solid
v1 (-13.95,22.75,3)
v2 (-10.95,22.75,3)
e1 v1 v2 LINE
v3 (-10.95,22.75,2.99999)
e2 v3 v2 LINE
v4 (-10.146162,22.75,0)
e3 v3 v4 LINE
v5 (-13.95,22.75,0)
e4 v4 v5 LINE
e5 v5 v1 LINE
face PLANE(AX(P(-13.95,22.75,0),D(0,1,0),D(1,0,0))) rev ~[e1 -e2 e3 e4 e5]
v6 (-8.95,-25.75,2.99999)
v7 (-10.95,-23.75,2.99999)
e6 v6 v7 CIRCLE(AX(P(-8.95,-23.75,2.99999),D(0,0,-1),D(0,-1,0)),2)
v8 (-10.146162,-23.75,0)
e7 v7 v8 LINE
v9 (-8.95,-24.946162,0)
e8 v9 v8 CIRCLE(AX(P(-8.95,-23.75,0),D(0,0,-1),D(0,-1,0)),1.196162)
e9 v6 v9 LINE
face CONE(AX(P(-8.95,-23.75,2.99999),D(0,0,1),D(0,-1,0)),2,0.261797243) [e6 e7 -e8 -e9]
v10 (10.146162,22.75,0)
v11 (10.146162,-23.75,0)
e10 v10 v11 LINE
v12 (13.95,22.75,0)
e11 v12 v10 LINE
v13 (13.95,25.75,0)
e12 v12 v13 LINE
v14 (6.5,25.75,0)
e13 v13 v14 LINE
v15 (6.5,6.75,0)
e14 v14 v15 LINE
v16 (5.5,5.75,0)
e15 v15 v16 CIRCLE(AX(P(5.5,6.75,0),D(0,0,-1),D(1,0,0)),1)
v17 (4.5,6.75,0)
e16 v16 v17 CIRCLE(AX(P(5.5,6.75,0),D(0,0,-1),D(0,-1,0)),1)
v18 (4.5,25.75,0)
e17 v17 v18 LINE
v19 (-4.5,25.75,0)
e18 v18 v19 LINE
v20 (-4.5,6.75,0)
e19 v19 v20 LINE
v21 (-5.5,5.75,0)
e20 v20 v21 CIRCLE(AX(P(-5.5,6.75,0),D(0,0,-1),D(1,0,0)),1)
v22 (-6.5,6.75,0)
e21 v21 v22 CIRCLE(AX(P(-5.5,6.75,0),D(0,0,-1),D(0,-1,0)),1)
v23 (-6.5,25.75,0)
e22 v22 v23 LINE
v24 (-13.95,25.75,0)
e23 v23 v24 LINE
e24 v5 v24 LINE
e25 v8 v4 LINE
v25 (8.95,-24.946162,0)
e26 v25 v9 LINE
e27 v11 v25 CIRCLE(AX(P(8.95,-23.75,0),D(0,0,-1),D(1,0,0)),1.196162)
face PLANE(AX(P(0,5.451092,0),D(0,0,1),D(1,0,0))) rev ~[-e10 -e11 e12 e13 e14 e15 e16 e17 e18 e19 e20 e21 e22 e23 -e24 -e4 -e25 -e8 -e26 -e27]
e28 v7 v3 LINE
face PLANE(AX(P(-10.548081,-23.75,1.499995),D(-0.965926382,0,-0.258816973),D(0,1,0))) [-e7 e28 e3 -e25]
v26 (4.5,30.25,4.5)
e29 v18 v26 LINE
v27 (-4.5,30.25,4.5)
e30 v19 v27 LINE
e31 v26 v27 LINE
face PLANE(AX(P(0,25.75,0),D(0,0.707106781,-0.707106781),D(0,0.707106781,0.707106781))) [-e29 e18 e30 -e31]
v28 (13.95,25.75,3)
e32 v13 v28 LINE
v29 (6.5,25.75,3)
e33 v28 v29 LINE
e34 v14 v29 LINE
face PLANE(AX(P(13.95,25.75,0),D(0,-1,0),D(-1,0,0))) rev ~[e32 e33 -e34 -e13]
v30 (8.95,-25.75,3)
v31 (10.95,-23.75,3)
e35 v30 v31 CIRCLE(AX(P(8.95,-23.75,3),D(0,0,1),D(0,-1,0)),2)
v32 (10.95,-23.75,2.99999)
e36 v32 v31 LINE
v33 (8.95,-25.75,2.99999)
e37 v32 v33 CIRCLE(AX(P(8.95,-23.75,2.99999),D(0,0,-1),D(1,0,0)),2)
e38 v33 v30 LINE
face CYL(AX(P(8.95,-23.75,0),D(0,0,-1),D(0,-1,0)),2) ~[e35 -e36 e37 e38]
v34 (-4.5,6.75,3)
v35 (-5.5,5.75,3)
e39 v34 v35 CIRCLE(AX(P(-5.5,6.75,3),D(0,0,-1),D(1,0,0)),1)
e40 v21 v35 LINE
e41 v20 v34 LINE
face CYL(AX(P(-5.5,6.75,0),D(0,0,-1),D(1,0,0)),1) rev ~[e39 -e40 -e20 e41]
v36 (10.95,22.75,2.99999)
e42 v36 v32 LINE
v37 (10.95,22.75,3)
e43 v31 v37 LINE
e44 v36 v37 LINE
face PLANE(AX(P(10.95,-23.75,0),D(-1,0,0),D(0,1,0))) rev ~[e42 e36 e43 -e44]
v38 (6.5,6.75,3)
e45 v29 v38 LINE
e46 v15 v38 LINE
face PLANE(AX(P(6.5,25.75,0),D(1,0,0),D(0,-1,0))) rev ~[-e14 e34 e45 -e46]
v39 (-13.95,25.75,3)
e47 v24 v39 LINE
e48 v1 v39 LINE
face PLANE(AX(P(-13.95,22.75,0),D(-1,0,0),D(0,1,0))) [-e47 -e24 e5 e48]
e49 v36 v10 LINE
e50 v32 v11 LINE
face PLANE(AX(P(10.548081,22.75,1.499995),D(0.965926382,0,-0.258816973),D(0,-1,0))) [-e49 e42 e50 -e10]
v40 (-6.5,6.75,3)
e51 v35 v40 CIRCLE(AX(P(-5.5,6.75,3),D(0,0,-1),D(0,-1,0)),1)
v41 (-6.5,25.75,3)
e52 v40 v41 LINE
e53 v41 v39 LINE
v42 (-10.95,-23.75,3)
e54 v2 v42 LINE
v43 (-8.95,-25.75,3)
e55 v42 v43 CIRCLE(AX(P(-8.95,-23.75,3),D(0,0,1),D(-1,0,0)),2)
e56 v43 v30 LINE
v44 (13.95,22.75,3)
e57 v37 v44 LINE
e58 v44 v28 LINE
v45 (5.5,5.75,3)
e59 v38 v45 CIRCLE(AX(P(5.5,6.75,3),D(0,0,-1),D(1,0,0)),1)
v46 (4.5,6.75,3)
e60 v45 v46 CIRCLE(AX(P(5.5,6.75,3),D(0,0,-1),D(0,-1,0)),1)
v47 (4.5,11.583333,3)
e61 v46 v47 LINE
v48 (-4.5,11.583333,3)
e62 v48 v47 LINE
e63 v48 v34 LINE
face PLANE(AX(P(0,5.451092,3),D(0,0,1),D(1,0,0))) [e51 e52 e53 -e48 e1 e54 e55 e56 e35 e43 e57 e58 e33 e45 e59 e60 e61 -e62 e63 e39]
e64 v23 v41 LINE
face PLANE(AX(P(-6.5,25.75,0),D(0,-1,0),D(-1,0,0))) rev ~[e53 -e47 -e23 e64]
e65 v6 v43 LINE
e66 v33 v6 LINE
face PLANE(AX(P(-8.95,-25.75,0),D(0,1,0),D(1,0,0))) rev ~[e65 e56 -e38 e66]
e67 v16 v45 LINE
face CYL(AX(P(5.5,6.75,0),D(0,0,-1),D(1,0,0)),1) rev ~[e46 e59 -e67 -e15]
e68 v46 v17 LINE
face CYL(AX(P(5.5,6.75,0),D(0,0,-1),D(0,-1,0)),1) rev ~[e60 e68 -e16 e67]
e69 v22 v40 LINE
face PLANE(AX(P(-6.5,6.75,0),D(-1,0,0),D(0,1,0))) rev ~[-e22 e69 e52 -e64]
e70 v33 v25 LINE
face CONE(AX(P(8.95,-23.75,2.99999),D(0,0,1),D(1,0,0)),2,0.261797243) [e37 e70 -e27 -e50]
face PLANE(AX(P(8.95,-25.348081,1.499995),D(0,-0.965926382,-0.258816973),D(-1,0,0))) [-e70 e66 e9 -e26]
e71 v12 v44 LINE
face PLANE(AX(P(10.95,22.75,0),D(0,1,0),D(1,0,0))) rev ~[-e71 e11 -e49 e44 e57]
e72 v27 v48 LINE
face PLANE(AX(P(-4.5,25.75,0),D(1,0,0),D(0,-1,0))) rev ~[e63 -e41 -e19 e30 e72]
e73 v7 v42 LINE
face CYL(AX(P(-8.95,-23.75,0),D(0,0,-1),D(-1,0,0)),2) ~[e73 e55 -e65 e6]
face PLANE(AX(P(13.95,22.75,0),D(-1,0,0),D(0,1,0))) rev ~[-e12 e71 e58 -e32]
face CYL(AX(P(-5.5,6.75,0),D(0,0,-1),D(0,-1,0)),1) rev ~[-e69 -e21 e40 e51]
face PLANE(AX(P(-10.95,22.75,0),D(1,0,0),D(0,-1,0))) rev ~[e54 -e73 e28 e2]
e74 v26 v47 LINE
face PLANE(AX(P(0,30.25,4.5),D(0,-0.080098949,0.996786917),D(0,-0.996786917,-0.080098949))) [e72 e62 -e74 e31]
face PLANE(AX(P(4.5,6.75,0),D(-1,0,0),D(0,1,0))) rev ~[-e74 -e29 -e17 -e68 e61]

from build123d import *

# Parameters (mm, degrees)
F0_W     = 3
F0_H     = 3
F1_DEPTH = 3
F3_DEPTH = 4.5
F4_SIZE2 = 0.803838
F4_SIZE  = 2.99999


# Not quite as in the source:
# - a fillet or chamfer is up to 0.001 mm smaller than in the source, because OpenCascade refuses the exact size


with BuildPart() as f1:
    # F0 (on Top) → F1 (new body)
    with BuildSketch(Plane.XY):
        with BuildLine():
            Line((-6.5, 25.75), (-10.95, 25.75))
            Line((-10.95, 25.75), (-10.95, 22.75))
            Line((-10.95, 22.75), (-10.95, -23.75))
            ThreePointArc((-10.95, -23.75), (-10.3642135624, -25.1642135624), (-8.95, -25.75))
            Line((-8.95, -25.75), (8.95, -25.75))
            ThreePointArc((8.95, -25.75), (10.3642135624, -25.1642135624), (10.95, -23.75))
            Line((10.95, -23.75), (10.95, 22.75))
            Line((10.95, 22.75), (10.95, 25.75))
            Line((10.95, 25.75), (6.5, 25.75))
            Line((6.5, 25.75), (6.5, 6.75))
            ThreePointArc((6.5, 6.75), (6.2071067812, 6.0428932188), (5.5, 5.75))
            ThreePointArc((5.5, 5.75), (4.7928932188, 6.0428932188), (4.5, 6.75))
            Line((4.5, 6.75), (4.5, 25.75))
            Line((4.5, 25.75), (-4.5, 25.75))
            Line((-4.5, 25.75), (-4.5, 6.75))
            ThreePointArc((-4.5, 6.75), (-4.7928932188, 6.0428932188), (-5.5, 5.75))
            ThreePointArc((-5.5, 5.75), (-6.2071067812, 6.0428932188), (-6.5, 6.75))
            Line((-6.5, 6.75), (-6.5, 25.75))
        make_face()
        with Locations((-12.45, 24.25)):
            Rectangle(F0_W, F0_H)
        with Locations((12.45, 24.25)):
            Rectangle(F0_W, F0_H)
    extrude(amount=F1_DEPTH)

    # F2 (on Right) → F3 (join, symmetric)
    with BuildSketch(Plane.YZ):
        Polygon((-25.75, 0), (25.75, 0), (30.25, 4.5), align=None)
    extrude(amount=F3_DEPTH, both=True)

    # F4 (size 3 and 0.8038475773 in the source; OpenCascade refuses exactly that, so slightly less here)
    f4_edges = [f1.edges().sort_by_distance(p)[0] for p in [
        (0, -25.75, 0),
    ]]
    f4_side = f1.faces().sort_by_distance((0, -25.75, 1.5))[0]
    chamfer(f4_edges, length=F4_SIZE, length2=F4_SIZE2, reference=f4_side)


solid = f1.part
